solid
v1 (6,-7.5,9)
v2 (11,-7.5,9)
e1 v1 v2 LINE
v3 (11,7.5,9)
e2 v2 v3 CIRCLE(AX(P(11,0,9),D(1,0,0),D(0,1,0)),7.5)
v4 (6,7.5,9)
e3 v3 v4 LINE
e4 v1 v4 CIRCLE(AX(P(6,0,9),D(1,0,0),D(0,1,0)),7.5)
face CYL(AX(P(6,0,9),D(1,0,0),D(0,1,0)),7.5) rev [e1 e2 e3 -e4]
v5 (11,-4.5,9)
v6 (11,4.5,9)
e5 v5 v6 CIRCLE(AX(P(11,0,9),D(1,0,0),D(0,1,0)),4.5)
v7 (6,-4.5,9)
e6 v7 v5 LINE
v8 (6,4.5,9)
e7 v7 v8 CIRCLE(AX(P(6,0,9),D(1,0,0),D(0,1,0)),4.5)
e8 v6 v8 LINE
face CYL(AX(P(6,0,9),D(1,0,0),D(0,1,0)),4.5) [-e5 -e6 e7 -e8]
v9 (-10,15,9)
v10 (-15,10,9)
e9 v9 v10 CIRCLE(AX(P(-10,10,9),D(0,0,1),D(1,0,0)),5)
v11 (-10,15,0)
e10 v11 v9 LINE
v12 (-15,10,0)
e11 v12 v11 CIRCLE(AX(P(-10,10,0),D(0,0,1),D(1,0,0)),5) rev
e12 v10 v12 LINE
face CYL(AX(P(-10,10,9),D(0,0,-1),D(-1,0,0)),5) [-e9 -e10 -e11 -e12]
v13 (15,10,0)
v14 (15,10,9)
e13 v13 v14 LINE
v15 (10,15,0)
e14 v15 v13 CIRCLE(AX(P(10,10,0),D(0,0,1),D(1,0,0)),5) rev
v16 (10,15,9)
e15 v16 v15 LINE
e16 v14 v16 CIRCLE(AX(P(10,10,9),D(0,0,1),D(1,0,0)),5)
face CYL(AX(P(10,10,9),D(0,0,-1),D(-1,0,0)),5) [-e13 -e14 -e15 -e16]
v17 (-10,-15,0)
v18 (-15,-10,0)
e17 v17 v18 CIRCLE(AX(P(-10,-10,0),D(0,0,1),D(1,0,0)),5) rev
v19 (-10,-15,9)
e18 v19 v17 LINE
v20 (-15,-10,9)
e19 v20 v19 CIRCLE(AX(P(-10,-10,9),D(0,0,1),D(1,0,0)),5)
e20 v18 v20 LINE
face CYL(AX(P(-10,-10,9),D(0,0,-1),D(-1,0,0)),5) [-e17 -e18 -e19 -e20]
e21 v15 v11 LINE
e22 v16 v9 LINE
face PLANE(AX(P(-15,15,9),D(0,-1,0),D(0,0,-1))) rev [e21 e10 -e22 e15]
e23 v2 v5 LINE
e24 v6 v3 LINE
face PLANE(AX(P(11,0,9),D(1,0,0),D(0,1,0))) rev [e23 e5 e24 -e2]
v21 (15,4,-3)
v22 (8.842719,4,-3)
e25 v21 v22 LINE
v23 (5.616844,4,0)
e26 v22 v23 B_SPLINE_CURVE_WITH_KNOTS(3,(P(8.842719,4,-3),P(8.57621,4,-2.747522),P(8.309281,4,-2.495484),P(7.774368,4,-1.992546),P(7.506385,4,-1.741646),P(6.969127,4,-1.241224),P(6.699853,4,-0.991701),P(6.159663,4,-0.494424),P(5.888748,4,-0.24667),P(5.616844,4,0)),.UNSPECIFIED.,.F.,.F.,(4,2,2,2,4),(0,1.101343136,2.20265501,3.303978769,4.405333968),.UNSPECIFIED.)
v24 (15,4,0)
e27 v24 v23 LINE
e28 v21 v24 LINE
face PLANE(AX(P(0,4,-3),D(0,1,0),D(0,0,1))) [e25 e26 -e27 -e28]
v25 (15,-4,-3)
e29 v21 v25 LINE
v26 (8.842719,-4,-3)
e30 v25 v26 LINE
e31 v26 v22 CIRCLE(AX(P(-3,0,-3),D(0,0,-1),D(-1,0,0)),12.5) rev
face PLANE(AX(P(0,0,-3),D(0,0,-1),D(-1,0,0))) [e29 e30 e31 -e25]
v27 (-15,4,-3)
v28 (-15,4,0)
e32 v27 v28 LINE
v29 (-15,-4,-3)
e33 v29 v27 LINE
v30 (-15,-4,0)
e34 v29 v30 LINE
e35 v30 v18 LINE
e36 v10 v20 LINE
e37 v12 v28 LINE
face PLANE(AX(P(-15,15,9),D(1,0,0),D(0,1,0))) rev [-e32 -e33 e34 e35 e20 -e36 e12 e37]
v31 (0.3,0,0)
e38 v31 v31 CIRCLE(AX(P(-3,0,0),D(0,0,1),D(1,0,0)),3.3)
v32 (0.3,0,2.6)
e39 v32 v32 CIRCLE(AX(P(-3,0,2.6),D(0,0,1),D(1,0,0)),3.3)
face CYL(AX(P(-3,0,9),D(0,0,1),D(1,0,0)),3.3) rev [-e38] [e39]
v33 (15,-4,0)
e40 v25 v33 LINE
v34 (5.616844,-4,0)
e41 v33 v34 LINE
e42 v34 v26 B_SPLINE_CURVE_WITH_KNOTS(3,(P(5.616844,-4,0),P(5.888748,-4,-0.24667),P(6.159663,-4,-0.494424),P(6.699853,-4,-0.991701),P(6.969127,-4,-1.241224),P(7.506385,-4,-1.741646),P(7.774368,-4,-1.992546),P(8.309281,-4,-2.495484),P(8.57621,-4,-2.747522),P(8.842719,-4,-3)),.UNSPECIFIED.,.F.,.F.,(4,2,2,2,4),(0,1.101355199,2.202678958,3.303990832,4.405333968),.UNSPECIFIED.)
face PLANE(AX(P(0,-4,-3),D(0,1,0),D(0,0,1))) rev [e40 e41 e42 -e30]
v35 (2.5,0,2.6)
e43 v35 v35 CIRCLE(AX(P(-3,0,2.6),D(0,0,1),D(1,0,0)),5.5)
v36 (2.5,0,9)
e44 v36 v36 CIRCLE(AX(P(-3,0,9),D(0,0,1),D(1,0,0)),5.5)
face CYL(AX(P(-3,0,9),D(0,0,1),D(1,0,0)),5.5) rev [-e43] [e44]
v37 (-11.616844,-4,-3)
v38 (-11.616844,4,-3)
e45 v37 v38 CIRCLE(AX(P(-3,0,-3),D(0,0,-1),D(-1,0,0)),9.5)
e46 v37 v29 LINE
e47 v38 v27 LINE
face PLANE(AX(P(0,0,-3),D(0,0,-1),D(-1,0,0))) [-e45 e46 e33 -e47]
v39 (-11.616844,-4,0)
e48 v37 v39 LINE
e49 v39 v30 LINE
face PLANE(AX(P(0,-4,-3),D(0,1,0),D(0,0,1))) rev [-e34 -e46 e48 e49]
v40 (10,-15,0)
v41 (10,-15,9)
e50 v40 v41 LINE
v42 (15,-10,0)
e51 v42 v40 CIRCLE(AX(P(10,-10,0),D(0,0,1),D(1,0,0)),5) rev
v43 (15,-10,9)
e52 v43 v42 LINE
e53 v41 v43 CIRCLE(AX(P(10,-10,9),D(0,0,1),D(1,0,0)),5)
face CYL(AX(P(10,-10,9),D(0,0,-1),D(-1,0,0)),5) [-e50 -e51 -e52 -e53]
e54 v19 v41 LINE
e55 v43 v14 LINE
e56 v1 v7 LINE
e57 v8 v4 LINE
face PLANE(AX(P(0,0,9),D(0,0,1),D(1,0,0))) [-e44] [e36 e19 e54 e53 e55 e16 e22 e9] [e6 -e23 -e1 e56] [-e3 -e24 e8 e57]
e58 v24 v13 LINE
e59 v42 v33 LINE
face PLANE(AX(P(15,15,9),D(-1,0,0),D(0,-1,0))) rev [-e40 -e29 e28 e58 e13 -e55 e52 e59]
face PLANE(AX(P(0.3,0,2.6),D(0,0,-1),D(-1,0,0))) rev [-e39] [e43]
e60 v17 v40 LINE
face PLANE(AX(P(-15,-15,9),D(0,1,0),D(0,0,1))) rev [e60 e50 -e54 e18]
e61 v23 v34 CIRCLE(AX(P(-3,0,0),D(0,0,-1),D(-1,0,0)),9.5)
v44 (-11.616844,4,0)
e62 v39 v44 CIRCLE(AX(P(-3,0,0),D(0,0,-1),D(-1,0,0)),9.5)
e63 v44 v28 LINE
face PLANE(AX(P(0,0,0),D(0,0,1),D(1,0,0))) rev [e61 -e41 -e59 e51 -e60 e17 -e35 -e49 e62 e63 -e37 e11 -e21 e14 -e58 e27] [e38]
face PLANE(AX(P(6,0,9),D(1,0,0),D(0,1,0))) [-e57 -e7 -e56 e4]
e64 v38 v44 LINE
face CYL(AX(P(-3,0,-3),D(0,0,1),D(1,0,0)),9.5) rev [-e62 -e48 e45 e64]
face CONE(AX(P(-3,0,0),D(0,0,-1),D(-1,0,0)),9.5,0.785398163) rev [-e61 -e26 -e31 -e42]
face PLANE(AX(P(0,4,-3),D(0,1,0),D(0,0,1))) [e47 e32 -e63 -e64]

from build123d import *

# Parameters (mm, degrees)
SKICA1_W                                         = 30
SKICA1_H                                         = 30
P_IDAT_VYSUNUT_M1_DEPTH                          = 9
V_LCOV_ZAHLOUBEN_PRO_M6_ROUBY_S_VNIT_D           = 6.6
V_LCOV_ZAHLOUBEN_PRO_M6_ROUBY_S_VNIT_CBORE_D     = 11
V_LCOV_ZAHLOUBEN_PRO_M6_ROUBY_S_VNIT_CBORE_DEPTH = 6.4
TIE_SKETCH_R                                     = 7.5
TIE_SKETCH_R_2                                   = 4.5
ODEBRAT_VYSUNUT_M1_DEPTH                         = 5
P_IDAT_VYSUNUT_M2_DEPTH                          = 3
ZKOSEN_1_SIZE                                    = 3
ZAOBLIT1_R                                       = 5


with BuildPart() as part:
    # Skica1 → Přidat vysunutím1 (new body)
    with BuildSketch(Plane.XY):
        Rectangle(SKICA1_W, SKICA1_H)
    extrude(amount=P_IDAT_VYSUNUT_M1_DEPTH)

    # Válcové zahloubení pro M6 šrouby s vnitřním šestihranem1 (through all)
    with Locations(Plane.XY.offset(9)):
        with Locations((-3, 0), (-24.772543922, -8.516747489)):
            CounterBoreHole(V_LCOV_ZAHLOUBEN_PRO_M6_ROUBY_S_VNIT_D / 2, V_LCOV_ZAHLOUBEN_PRO_M6_ROUBY_S_VNIT_CBORE_D / 2, V_LCOV_ZAHLOUBEN_PRO_M6_ROUBY_S_VNIT_CBORE_DEPTH)

    # Tie sketch → Odebrat vysunutím1 (cut)
    with BuildSketch(Plane(origin=(11, 0, 0), x_dir=(0, 0, -1), z_dir=(1, 0, 0))):
        with Locations((-9, 0)):
            Circle(TIE_SKETCH_R)
        with Locations((-9, 0)):
            Circle(TIE_SKETCH_R_2, mode=Mode.SUBTRACT)
    extrude(amount=-ODEBRAT_VYSUNUT_M1_DEPTH, mode=Mode.SUBTRACT)

    # Skica6 → Přidat vysunutím2 (add)
    with BuildSketch(Plane(origin=(0, 0, 0), x_dir=(-1, 0, 0), z_dir=(0, 0, -1))):
        with BuildLine():
            ThreePointArc((-5.61684397, -4), (-6.5, 0), (-5.61684397, 4))
            Line((-5.61684397, 4), (-15, 4))
            Line((-15, 4), (-15, -4))
            Line((-15, -4), (-5.61684397, -4))
        make_face()
        with BuildLine():
            Line((15, 4), (11.61684397, 4))
            ThreePointArc((11.61684397, 4), (12.2765839, 2.048167753), (12.5, 0))
            ThreePointArc((12.5, 0), (12.2765839, -2.048167753), (11.61684397, -4))
            Line((11.61684397, -4), (15, -4))
            Line((15, -4), (15, 4))
        make_face()
    extrude(amount=P_IDAT_VYSUNUT_M2_DEPTH)

    # Zkosení1
    zkosen_1_edges = [part.edges().sort_by_distance(p)[0] for p in [
        (6.5, 0, -3),
    ]]
    chamfer(zkosen_1_edges, length=ZKOSEN_1_SIZE - 0.0001)  # a hair under: the kernel refuses the full size

    # Zaoblit1
    zaoblit1_edges = [part.edges().sort_by_distance(p)[0] for p in [
        (15, -15, 4.5),
        (-15, -15, 4.5),
        (-15, 15, 4.5),
        (15, 15, 4.5),
    ]]
    fillet(zaoblit1_edges, radius=ZAOBLIT1_R)


solid = part.part
